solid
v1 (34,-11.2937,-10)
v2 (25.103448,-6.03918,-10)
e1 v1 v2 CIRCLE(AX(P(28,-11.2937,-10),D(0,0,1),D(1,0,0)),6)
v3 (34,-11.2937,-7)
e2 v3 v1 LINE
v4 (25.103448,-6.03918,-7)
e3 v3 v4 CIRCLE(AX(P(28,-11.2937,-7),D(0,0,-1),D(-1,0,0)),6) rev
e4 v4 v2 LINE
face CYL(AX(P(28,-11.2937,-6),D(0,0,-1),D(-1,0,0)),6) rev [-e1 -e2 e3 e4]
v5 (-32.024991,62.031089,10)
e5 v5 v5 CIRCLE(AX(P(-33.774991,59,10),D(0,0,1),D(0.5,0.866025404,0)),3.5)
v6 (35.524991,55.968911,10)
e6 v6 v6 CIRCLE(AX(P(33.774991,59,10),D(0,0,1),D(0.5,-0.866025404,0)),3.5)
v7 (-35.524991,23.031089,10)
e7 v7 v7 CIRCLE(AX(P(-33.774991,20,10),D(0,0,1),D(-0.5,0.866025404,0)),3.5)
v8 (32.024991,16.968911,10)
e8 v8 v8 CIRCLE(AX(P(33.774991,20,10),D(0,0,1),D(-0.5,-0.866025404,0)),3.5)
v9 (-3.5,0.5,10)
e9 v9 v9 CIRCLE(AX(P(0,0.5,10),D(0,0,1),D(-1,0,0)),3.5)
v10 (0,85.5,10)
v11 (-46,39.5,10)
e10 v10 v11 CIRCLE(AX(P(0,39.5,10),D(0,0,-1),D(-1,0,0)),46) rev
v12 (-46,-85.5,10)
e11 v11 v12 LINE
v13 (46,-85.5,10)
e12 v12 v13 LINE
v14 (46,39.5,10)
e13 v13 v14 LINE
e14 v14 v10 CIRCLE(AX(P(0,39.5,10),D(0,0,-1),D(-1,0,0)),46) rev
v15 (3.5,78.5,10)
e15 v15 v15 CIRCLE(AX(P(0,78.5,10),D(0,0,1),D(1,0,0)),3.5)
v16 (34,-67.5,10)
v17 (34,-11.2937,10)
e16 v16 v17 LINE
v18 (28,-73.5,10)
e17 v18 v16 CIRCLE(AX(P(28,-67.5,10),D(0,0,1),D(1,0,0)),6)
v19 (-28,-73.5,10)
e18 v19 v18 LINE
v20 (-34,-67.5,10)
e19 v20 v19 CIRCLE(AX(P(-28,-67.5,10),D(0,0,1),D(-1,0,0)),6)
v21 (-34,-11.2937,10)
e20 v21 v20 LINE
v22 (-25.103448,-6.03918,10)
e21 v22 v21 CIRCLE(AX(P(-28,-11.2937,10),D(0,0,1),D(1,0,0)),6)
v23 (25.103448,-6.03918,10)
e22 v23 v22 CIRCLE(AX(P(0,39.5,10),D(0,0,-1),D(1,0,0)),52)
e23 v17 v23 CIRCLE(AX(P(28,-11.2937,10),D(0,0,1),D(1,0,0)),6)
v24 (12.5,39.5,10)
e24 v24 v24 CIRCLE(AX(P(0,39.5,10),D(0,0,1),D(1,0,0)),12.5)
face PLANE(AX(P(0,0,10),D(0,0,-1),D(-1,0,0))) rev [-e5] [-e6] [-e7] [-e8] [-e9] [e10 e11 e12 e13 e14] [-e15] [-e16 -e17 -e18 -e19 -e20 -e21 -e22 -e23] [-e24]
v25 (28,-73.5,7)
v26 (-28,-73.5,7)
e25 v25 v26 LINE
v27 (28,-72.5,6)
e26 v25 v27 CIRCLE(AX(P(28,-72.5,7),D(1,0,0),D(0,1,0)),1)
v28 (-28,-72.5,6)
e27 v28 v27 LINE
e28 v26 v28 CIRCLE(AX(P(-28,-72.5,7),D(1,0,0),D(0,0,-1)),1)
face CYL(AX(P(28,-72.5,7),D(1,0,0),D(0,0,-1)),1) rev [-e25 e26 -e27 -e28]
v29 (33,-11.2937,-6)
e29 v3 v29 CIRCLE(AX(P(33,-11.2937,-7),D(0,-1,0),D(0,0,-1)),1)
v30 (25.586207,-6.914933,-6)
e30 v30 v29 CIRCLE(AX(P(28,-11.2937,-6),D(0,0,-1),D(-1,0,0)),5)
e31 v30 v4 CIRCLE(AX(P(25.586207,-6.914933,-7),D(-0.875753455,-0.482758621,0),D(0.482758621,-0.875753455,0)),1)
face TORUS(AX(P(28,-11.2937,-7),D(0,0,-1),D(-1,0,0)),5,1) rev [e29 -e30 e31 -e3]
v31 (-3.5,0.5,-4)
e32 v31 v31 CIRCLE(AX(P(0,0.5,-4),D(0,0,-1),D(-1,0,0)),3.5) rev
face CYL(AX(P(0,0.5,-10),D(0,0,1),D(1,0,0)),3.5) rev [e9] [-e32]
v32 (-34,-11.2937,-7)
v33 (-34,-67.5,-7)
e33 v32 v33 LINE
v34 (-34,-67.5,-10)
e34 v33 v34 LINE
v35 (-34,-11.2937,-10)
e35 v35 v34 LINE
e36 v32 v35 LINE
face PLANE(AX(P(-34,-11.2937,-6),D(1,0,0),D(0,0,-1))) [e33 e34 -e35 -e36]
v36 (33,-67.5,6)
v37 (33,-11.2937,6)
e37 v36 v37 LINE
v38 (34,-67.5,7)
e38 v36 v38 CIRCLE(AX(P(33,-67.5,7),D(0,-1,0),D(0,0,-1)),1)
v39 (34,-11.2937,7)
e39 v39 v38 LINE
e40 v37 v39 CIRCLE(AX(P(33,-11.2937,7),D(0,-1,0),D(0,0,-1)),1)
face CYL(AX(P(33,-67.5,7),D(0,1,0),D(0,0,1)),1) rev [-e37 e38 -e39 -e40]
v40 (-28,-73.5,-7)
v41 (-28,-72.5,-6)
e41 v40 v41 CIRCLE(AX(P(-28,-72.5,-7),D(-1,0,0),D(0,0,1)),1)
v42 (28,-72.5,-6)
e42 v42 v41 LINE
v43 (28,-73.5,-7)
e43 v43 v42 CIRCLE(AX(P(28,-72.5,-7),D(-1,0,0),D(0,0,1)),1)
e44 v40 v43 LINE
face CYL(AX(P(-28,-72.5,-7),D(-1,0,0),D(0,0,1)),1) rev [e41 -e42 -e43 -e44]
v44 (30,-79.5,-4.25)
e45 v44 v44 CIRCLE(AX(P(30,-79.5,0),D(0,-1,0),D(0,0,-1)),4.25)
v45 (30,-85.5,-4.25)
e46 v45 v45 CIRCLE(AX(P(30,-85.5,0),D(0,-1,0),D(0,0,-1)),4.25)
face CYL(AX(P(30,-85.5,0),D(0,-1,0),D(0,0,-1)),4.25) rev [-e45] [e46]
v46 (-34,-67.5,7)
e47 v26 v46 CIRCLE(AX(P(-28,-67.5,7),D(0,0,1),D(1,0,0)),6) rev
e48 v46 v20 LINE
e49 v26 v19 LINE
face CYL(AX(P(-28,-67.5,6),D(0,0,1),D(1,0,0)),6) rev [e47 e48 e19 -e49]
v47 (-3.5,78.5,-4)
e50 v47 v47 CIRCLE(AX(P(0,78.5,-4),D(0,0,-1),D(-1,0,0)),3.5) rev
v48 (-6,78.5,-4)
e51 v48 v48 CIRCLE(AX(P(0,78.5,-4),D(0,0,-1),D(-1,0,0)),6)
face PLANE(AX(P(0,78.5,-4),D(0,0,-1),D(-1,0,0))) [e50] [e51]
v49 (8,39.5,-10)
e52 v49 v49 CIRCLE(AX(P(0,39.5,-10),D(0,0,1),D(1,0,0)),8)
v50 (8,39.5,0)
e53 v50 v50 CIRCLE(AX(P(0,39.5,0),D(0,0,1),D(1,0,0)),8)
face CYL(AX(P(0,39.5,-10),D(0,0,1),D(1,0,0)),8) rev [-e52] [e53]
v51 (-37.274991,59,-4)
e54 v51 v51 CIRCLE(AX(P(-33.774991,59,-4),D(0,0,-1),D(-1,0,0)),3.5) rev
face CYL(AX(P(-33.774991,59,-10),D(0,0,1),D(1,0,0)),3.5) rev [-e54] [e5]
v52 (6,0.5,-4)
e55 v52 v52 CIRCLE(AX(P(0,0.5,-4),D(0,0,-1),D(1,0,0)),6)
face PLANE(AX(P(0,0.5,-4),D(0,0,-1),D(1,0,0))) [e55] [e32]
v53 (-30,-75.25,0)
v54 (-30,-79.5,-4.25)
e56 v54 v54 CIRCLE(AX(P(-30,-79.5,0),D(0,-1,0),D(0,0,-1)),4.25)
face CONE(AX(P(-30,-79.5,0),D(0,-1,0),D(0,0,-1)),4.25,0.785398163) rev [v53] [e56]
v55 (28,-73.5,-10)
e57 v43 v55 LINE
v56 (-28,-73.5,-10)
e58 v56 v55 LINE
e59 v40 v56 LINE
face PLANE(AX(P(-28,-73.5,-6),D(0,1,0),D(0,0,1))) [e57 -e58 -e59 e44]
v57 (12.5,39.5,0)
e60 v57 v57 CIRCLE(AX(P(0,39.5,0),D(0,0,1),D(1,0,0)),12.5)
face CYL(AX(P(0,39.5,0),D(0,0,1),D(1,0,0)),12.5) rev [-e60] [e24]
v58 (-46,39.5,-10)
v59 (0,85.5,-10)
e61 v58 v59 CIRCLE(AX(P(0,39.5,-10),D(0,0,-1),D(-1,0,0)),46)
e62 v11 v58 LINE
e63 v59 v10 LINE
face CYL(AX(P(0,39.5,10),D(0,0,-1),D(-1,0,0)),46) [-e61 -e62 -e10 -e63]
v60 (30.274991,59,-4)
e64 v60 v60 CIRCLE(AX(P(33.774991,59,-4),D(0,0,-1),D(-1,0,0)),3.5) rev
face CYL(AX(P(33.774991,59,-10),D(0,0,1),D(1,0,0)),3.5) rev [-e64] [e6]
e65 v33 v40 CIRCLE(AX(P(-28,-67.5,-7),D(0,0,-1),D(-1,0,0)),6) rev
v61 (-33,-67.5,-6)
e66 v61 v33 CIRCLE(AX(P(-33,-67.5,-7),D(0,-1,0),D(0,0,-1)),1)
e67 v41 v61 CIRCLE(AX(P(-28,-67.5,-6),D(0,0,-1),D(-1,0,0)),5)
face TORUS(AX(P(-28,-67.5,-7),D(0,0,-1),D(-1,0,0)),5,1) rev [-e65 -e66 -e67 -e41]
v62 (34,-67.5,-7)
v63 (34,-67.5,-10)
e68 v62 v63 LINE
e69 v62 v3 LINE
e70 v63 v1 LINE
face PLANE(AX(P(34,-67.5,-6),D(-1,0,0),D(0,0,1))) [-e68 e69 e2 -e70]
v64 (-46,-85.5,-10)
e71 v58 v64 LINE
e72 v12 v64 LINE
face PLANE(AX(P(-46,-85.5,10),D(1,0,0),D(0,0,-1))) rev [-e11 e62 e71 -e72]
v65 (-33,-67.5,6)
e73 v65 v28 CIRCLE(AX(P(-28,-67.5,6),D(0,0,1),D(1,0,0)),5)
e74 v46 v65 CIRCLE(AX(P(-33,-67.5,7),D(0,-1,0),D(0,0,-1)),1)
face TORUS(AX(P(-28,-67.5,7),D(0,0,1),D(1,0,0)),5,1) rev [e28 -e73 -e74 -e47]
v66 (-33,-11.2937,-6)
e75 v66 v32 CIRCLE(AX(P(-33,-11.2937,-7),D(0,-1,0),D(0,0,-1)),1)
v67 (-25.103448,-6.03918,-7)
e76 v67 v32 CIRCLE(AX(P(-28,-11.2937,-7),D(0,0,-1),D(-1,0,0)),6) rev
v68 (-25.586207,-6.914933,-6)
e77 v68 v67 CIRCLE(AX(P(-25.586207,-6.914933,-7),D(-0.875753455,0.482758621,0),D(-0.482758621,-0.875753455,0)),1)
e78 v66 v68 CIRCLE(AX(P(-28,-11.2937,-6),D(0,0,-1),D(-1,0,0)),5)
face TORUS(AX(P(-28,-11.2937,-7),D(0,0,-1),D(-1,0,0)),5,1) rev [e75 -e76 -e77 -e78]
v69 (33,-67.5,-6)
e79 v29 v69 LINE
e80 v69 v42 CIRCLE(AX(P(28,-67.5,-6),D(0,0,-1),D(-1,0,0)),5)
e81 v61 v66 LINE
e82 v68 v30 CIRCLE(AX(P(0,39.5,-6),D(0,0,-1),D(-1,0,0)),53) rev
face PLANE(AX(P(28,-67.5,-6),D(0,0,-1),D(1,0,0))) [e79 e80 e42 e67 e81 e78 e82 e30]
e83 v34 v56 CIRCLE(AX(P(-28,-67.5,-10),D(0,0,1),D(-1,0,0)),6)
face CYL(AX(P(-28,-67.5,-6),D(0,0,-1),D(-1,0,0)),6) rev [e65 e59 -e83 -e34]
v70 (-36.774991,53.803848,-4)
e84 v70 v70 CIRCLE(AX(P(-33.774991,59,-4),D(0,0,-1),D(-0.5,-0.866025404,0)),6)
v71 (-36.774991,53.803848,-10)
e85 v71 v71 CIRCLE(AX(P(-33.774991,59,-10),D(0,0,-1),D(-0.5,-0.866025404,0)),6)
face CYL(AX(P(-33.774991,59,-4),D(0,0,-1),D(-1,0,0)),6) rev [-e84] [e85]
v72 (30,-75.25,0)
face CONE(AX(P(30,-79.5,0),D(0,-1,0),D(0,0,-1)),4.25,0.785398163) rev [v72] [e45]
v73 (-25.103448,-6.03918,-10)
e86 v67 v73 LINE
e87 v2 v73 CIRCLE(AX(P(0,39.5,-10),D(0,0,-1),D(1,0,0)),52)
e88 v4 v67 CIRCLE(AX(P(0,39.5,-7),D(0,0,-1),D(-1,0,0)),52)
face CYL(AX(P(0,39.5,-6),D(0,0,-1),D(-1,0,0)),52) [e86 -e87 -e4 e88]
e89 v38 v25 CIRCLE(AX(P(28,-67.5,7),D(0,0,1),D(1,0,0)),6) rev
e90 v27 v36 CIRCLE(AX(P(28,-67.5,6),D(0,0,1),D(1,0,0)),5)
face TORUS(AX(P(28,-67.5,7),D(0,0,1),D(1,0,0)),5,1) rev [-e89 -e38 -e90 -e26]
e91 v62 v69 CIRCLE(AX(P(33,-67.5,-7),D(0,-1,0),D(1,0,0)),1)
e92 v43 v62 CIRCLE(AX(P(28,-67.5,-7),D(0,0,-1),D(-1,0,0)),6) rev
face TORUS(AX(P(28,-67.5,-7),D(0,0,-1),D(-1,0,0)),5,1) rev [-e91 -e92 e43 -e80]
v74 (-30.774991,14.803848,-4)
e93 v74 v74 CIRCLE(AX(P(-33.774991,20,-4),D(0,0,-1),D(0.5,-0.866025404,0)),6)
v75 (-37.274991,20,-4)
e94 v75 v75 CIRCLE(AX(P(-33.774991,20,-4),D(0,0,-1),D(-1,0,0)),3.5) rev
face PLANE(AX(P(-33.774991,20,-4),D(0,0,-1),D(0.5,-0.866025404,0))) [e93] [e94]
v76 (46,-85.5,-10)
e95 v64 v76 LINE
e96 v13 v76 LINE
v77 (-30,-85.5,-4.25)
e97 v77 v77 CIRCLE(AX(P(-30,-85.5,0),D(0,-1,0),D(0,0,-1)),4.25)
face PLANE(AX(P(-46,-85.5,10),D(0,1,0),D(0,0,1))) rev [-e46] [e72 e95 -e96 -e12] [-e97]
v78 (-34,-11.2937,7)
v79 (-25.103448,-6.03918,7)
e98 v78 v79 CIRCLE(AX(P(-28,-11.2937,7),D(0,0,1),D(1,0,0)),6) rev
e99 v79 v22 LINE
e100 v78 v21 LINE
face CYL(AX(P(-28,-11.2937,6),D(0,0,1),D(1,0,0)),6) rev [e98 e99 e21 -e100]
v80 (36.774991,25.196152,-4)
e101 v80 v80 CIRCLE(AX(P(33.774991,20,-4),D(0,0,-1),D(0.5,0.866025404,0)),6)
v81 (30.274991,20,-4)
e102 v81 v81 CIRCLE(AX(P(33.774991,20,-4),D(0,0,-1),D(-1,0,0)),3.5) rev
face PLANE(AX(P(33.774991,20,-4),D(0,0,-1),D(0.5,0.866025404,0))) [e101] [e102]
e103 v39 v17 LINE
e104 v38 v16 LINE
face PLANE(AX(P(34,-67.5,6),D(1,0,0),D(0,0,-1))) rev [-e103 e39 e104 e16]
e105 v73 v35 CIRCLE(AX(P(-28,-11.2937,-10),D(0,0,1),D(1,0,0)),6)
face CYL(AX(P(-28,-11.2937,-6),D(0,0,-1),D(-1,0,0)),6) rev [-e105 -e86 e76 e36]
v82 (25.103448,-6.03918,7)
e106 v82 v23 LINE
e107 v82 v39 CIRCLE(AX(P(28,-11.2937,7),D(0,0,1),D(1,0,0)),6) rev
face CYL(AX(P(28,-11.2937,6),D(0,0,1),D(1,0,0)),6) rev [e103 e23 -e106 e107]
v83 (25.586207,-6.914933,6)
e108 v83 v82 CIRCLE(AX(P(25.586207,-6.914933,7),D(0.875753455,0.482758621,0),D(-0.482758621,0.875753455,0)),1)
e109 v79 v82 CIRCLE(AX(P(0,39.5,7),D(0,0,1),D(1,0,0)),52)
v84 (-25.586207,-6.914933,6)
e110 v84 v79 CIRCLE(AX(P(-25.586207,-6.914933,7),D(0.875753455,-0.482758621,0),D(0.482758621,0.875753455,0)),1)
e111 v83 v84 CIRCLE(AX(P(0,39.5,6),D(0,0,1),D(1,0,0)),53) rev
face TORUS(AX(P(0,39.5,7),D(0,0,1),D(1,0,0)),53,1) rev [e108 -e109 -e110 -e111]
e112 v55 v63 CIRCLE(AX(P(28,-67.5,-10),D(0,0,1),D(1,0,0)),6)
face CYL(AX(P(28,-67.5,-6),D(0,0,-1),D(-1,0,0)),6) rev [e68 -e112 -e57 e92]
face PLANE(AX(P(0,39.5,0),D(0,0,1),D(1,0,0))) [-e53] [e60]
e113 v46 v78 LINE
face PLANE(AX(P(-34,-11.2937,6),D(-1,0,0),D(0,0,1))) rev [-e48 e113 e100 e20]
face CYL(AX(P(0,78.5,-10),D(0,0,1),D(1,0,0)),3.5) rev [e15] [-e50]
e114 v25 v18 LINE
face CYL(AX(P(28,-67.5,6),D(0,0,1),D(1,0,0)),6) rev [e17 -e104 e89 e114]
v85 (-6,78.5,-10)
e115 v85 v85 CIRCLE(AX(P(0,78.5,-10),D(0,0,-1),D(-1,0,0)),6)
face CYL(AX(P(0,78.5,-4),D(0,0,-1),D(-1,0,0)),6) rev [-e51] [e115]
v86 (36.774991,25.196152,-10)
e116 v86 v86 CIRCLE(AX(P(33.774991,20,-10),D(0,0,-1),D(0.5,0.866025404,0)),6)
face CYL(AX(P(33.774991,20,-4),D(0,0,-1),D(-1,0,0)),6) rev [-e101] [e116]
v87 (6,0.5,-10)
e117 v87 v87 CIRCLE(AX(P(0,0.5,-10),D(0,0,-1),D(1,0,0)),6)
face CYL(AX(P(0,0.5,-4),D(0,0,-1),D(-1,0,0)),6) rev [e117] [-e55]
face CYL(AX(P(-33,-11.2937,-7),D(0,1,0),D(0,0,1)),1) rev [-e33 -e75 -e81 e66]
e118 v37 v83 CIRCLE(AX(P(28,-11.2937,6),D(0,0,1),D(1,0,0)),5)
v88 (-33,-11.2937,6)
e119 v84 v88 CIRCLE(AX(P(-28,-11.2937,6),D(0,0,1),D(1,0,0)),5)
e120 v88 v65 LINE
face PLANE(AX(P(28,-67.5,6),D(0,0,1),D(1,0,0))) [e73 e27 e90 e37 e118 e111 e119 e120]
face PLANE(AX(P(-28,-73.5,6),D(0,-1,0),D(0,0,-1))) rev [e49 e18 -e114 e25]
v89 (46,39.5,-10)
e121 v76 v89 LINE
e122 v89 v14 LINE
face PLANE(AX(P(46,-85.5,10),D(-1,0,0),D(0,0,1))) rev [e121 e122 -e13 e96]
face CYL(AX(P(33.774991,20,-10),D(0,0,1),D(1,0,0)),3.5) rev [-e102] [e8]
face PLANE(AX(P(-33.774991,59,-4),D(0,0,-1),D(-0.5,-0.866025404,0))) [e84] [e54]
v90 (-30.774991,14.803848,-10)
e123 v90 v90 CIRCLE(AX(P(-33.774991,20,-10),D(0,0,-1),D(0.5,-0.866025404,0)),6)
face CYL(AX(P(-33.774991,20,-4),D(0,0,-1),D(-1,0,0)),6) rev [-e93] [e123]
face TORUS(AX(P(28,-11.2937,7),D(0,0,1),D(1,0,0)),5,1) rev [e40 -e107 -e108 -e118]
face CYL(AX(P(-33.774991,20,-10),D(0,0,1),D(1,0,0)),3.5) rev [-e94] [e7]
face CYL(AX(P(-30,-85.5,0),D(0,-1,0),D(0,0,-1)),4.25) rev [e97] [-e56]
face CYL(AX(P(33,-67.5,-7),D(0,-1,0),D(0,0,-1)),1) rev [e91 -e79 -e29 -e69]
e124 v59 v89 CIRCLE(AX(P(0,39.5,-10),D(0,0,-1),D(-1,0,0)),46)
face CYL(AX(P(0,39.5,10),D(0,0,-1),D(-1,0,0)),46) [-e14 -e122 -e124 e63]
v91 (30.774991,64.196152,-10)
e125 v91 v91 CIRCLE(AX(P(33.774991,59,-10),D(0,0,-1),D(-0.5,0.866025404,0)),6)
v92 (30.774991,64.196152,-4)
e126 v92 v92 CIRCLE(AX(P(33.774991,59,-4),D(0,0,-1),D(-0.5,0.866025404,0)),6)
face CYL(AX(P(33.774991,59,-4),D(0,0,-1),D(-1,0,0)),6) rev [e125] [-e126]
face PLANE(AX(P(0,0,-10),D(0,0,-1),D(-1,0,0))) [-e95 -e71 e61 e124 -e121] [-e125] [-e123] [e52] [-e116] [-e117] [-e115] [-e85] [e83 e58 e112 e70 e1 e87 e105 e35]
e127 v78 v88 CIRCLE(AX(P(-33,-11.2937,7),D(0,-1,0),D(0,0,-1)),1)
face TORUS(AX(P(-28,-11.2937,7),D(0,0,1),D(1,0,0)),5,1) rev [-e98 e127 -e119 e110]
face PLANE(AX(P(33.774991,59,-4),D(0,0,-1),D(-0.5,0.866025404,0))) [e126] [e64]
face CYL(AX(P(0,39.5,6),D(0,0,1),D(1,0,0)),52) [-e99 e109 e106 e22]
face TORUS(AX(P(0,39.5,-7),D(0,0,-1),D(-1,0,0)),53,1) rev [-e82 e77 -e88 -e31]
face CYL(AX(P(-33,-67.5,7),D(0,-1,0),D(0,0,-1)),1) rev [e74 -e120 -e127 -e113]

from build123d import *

# Parameters (mm, degrees)
SKETCH1_W                        = 92
SKETCH1_H                        = 171
BOSS_EXTRUDE1_DEPTH              = 10
FILLET1_R                        = 46
SKETCH3_R                        = 3.5
CUT_EXTRUDE1_DEPTH               = 100.127443223
SKETCH4_R                        = 6
CUT_EXTRUDE2_DEPTH               = 6
CIRPATTERN1_COUNT                = 6
SKETCH6_R                        = 12.5
CUT_EXTRUDE3_DEPTH               = 10
SKETCH7_R                        = 8
CUT_EXTRUDE4_DEPTH               = 100.127443223
TAP_DRILL_FOR_M10X1_5_TAP1_D     = 8.5
TAP_DRILL_FOR_M10X1_5_TAP1_DEPTH = 6
TAP_DRILL_FOR_M10X1_5_TAP1_TIP   = 4.25
CUT_EXTRUDE5_DEPTH               = 4
FILLET2_R                        = 1


with BuildPart() as part:
    # Sketch1 → Boss-Extrude1 (new, symmetric)
    with BuildSketch(Plane.XY):
        Rectangle(SKETCH1_W, SKETCH1_H)
    extrude(amount=BOSS_EXTRUDE1_DEPTH, both=True)

    # Fillet1
    fillet1_edges = [part.edges().sort_by_distance(p)[0] for p in [
        (46, 85.5, 0),
        (-46, 85.5, 0),
    ]]
    fillet(fillet1_edges, radius=FILLET1_R - 0.0001)  # a hair under: the kernel refuses the full size

    # Sketch3 → Cut-Extrude1 (cut, through all)
    with BuildSketch(Plane.XY.offset(10)):
        with Locations((0, 78.5)):
            Circle(SKETCH3_R)
    cut_extrude1 = extrude(amount=-CUT_EXTRUDE1_DEPTH, mode=Mode.SUBTRACT)

    # Sketch4 → Cut-Extrude2 (cut)
    with BuildSketch(Plane(origin=(0, 0, -10), x_dir=(-1, 0, 0), z_dir=(0, 0, -1))):
        with Locations((0, 78.5)):
            Circle(SKETCH4_R)
    cut_extrude2 = extrude(amount=-CUT_EXTRUDE2_DEPTH, mode=Mode.SUBTRACT)

    # CirPattern1: Cut-Extrude1, Cut-Extrude2 ×6 about axis
    cirpattern1_axis = Axis((0, 39.5, 0), (0, 0, 1))
    add([cut_extrude1.rotate(cirpattern1_axis, i * 360 / CIRPATTERN1_COUNT) for i in range(1, CIRPATTERN1_COUNT)], mode=Mode.SUBTRACT)
    add([cut_extrude2.rotate(cirpattern1_axis, i * 360 / CIRPATTERN1_COUNT) for i in range(1, CIRPATTERN1_COUNT)], mode=Mode.SUBTRACT)

    # Sketch6 → Cut-Extrude3 (cut)
    with BuildSketch(Plane.XY.offset(10)):
        with Locations((0, 39.5)):
            Circle(SKETCH6_R)
    extrude(amount=-CUT_EXTRUDE3_DEPTH, mode=Mode.SUBTRACT)

    # Sketch7 → Cut-Extrude4 (cut, through all)
    with BuildSketch(Plane.XY.offset(10)):
        with Locations((0, 39.5)):
            Circle(SKETCH7_R)
    extrude(amount=-CUT_EXTRUDE4_DEPTH, mode=Mode.SUBTRACT)

    # Tap Drill for M10x1.5 Tap1
    with Locations(Plane(origin=(0, -85.5, 0), x_dir=(-1, 0, 0), z_dir=(0, -1, 0))):
        with Locations((30, 0), (-30, 0)):
            Hole(TAP_DRILL_FOR_M10X1_5_TAP1_D / 2, depth=TAP_DRILL_FOR_M10X1_5_TAP1_DEPTH)
            with Locations((0, 0, -(TAP_DRILL_FOR_M10X1_5_TAP1_DEPTH + TAP_DRILL_FOR_M10X1_5_TAP1_TIP / 2))):  # 90° drill point
                Cone(0, TAP_DRILL_FOR_M10X1_5_TAP1_D / 2, TAP_DRILL_FOR_M10X1_5_TAP1_TIP, mode=Mode.SUBTRACT)

    # Sketch12 → Cut-Extrude5 (cut)
    with BuildSketch(Plane.XY.offset(10)):
        with BuildLine():
            Line((34, -67.5), (34, -11.293700397))
            ThreePointArc((34, -11.293700397), (31.051285766, -6.127497229), (25.103448276, -6.039179666))
            ThreePointArc((25.103448276, -6.039179666), (0, -12.5), (-25.103448276, -6.039179666))
            ThreePointArc((-25.103448276, -6.039179666), (-31.051285766, -6.127497229), (-34, -11.293700397))
            Line((-34, -11.293700397), (-34, -67.5))
            ThreePointArc((-34, -67.5), (-32.242640687, -71.742640687), (-28, -73.5))
            Line((-28, -73.5), (28, -73.5))
            ThreePointArc((28, -73.5), (32.242640687, -71.742640687), (34, -67.5))
        make_face()
    cut_extrude5 = extrude(amount=-CUT_EXTRUDE5_DEPTH, mode=Mode.SUBTRACT)

    # Mirror1: Cut-Extrude5 across plane
    add(cut_extrude5.mirror(Plane.XY), mode=Mode.SUBTRACT)

    # Fillet2
    fillet2_edges = [part.edges().sort_by_distance(p)[0] for p in [
        (32.242640687, -71.742640687, 6),
        (0, -73.5, 6),
        (-32.242640687, -71.742640687, 6),
        (-34, -39.396850198, 6),
        (-31.051285766, -6.127497229, 6),
        (0, -12.5, 6),
        (31.051285766, -6.127497229, 6),
        (34, -39.396850198, 6),
        (32.242640687, -71.742640687, -6),
        (34, -39.396850198, -6),
        (31.051285766, -6.127497229, -6),
        (0, -12.5, -6),
        (-31.051285766, -6.127497229, -6),
        (-34, -39.396850198, -6),
        (-32.242640687, -71.742640687, -6),
        (0, -73.5, -6),
    ]]
    fillet(fillet2_edges, radius=FILLET2_R)


solid = part.part
